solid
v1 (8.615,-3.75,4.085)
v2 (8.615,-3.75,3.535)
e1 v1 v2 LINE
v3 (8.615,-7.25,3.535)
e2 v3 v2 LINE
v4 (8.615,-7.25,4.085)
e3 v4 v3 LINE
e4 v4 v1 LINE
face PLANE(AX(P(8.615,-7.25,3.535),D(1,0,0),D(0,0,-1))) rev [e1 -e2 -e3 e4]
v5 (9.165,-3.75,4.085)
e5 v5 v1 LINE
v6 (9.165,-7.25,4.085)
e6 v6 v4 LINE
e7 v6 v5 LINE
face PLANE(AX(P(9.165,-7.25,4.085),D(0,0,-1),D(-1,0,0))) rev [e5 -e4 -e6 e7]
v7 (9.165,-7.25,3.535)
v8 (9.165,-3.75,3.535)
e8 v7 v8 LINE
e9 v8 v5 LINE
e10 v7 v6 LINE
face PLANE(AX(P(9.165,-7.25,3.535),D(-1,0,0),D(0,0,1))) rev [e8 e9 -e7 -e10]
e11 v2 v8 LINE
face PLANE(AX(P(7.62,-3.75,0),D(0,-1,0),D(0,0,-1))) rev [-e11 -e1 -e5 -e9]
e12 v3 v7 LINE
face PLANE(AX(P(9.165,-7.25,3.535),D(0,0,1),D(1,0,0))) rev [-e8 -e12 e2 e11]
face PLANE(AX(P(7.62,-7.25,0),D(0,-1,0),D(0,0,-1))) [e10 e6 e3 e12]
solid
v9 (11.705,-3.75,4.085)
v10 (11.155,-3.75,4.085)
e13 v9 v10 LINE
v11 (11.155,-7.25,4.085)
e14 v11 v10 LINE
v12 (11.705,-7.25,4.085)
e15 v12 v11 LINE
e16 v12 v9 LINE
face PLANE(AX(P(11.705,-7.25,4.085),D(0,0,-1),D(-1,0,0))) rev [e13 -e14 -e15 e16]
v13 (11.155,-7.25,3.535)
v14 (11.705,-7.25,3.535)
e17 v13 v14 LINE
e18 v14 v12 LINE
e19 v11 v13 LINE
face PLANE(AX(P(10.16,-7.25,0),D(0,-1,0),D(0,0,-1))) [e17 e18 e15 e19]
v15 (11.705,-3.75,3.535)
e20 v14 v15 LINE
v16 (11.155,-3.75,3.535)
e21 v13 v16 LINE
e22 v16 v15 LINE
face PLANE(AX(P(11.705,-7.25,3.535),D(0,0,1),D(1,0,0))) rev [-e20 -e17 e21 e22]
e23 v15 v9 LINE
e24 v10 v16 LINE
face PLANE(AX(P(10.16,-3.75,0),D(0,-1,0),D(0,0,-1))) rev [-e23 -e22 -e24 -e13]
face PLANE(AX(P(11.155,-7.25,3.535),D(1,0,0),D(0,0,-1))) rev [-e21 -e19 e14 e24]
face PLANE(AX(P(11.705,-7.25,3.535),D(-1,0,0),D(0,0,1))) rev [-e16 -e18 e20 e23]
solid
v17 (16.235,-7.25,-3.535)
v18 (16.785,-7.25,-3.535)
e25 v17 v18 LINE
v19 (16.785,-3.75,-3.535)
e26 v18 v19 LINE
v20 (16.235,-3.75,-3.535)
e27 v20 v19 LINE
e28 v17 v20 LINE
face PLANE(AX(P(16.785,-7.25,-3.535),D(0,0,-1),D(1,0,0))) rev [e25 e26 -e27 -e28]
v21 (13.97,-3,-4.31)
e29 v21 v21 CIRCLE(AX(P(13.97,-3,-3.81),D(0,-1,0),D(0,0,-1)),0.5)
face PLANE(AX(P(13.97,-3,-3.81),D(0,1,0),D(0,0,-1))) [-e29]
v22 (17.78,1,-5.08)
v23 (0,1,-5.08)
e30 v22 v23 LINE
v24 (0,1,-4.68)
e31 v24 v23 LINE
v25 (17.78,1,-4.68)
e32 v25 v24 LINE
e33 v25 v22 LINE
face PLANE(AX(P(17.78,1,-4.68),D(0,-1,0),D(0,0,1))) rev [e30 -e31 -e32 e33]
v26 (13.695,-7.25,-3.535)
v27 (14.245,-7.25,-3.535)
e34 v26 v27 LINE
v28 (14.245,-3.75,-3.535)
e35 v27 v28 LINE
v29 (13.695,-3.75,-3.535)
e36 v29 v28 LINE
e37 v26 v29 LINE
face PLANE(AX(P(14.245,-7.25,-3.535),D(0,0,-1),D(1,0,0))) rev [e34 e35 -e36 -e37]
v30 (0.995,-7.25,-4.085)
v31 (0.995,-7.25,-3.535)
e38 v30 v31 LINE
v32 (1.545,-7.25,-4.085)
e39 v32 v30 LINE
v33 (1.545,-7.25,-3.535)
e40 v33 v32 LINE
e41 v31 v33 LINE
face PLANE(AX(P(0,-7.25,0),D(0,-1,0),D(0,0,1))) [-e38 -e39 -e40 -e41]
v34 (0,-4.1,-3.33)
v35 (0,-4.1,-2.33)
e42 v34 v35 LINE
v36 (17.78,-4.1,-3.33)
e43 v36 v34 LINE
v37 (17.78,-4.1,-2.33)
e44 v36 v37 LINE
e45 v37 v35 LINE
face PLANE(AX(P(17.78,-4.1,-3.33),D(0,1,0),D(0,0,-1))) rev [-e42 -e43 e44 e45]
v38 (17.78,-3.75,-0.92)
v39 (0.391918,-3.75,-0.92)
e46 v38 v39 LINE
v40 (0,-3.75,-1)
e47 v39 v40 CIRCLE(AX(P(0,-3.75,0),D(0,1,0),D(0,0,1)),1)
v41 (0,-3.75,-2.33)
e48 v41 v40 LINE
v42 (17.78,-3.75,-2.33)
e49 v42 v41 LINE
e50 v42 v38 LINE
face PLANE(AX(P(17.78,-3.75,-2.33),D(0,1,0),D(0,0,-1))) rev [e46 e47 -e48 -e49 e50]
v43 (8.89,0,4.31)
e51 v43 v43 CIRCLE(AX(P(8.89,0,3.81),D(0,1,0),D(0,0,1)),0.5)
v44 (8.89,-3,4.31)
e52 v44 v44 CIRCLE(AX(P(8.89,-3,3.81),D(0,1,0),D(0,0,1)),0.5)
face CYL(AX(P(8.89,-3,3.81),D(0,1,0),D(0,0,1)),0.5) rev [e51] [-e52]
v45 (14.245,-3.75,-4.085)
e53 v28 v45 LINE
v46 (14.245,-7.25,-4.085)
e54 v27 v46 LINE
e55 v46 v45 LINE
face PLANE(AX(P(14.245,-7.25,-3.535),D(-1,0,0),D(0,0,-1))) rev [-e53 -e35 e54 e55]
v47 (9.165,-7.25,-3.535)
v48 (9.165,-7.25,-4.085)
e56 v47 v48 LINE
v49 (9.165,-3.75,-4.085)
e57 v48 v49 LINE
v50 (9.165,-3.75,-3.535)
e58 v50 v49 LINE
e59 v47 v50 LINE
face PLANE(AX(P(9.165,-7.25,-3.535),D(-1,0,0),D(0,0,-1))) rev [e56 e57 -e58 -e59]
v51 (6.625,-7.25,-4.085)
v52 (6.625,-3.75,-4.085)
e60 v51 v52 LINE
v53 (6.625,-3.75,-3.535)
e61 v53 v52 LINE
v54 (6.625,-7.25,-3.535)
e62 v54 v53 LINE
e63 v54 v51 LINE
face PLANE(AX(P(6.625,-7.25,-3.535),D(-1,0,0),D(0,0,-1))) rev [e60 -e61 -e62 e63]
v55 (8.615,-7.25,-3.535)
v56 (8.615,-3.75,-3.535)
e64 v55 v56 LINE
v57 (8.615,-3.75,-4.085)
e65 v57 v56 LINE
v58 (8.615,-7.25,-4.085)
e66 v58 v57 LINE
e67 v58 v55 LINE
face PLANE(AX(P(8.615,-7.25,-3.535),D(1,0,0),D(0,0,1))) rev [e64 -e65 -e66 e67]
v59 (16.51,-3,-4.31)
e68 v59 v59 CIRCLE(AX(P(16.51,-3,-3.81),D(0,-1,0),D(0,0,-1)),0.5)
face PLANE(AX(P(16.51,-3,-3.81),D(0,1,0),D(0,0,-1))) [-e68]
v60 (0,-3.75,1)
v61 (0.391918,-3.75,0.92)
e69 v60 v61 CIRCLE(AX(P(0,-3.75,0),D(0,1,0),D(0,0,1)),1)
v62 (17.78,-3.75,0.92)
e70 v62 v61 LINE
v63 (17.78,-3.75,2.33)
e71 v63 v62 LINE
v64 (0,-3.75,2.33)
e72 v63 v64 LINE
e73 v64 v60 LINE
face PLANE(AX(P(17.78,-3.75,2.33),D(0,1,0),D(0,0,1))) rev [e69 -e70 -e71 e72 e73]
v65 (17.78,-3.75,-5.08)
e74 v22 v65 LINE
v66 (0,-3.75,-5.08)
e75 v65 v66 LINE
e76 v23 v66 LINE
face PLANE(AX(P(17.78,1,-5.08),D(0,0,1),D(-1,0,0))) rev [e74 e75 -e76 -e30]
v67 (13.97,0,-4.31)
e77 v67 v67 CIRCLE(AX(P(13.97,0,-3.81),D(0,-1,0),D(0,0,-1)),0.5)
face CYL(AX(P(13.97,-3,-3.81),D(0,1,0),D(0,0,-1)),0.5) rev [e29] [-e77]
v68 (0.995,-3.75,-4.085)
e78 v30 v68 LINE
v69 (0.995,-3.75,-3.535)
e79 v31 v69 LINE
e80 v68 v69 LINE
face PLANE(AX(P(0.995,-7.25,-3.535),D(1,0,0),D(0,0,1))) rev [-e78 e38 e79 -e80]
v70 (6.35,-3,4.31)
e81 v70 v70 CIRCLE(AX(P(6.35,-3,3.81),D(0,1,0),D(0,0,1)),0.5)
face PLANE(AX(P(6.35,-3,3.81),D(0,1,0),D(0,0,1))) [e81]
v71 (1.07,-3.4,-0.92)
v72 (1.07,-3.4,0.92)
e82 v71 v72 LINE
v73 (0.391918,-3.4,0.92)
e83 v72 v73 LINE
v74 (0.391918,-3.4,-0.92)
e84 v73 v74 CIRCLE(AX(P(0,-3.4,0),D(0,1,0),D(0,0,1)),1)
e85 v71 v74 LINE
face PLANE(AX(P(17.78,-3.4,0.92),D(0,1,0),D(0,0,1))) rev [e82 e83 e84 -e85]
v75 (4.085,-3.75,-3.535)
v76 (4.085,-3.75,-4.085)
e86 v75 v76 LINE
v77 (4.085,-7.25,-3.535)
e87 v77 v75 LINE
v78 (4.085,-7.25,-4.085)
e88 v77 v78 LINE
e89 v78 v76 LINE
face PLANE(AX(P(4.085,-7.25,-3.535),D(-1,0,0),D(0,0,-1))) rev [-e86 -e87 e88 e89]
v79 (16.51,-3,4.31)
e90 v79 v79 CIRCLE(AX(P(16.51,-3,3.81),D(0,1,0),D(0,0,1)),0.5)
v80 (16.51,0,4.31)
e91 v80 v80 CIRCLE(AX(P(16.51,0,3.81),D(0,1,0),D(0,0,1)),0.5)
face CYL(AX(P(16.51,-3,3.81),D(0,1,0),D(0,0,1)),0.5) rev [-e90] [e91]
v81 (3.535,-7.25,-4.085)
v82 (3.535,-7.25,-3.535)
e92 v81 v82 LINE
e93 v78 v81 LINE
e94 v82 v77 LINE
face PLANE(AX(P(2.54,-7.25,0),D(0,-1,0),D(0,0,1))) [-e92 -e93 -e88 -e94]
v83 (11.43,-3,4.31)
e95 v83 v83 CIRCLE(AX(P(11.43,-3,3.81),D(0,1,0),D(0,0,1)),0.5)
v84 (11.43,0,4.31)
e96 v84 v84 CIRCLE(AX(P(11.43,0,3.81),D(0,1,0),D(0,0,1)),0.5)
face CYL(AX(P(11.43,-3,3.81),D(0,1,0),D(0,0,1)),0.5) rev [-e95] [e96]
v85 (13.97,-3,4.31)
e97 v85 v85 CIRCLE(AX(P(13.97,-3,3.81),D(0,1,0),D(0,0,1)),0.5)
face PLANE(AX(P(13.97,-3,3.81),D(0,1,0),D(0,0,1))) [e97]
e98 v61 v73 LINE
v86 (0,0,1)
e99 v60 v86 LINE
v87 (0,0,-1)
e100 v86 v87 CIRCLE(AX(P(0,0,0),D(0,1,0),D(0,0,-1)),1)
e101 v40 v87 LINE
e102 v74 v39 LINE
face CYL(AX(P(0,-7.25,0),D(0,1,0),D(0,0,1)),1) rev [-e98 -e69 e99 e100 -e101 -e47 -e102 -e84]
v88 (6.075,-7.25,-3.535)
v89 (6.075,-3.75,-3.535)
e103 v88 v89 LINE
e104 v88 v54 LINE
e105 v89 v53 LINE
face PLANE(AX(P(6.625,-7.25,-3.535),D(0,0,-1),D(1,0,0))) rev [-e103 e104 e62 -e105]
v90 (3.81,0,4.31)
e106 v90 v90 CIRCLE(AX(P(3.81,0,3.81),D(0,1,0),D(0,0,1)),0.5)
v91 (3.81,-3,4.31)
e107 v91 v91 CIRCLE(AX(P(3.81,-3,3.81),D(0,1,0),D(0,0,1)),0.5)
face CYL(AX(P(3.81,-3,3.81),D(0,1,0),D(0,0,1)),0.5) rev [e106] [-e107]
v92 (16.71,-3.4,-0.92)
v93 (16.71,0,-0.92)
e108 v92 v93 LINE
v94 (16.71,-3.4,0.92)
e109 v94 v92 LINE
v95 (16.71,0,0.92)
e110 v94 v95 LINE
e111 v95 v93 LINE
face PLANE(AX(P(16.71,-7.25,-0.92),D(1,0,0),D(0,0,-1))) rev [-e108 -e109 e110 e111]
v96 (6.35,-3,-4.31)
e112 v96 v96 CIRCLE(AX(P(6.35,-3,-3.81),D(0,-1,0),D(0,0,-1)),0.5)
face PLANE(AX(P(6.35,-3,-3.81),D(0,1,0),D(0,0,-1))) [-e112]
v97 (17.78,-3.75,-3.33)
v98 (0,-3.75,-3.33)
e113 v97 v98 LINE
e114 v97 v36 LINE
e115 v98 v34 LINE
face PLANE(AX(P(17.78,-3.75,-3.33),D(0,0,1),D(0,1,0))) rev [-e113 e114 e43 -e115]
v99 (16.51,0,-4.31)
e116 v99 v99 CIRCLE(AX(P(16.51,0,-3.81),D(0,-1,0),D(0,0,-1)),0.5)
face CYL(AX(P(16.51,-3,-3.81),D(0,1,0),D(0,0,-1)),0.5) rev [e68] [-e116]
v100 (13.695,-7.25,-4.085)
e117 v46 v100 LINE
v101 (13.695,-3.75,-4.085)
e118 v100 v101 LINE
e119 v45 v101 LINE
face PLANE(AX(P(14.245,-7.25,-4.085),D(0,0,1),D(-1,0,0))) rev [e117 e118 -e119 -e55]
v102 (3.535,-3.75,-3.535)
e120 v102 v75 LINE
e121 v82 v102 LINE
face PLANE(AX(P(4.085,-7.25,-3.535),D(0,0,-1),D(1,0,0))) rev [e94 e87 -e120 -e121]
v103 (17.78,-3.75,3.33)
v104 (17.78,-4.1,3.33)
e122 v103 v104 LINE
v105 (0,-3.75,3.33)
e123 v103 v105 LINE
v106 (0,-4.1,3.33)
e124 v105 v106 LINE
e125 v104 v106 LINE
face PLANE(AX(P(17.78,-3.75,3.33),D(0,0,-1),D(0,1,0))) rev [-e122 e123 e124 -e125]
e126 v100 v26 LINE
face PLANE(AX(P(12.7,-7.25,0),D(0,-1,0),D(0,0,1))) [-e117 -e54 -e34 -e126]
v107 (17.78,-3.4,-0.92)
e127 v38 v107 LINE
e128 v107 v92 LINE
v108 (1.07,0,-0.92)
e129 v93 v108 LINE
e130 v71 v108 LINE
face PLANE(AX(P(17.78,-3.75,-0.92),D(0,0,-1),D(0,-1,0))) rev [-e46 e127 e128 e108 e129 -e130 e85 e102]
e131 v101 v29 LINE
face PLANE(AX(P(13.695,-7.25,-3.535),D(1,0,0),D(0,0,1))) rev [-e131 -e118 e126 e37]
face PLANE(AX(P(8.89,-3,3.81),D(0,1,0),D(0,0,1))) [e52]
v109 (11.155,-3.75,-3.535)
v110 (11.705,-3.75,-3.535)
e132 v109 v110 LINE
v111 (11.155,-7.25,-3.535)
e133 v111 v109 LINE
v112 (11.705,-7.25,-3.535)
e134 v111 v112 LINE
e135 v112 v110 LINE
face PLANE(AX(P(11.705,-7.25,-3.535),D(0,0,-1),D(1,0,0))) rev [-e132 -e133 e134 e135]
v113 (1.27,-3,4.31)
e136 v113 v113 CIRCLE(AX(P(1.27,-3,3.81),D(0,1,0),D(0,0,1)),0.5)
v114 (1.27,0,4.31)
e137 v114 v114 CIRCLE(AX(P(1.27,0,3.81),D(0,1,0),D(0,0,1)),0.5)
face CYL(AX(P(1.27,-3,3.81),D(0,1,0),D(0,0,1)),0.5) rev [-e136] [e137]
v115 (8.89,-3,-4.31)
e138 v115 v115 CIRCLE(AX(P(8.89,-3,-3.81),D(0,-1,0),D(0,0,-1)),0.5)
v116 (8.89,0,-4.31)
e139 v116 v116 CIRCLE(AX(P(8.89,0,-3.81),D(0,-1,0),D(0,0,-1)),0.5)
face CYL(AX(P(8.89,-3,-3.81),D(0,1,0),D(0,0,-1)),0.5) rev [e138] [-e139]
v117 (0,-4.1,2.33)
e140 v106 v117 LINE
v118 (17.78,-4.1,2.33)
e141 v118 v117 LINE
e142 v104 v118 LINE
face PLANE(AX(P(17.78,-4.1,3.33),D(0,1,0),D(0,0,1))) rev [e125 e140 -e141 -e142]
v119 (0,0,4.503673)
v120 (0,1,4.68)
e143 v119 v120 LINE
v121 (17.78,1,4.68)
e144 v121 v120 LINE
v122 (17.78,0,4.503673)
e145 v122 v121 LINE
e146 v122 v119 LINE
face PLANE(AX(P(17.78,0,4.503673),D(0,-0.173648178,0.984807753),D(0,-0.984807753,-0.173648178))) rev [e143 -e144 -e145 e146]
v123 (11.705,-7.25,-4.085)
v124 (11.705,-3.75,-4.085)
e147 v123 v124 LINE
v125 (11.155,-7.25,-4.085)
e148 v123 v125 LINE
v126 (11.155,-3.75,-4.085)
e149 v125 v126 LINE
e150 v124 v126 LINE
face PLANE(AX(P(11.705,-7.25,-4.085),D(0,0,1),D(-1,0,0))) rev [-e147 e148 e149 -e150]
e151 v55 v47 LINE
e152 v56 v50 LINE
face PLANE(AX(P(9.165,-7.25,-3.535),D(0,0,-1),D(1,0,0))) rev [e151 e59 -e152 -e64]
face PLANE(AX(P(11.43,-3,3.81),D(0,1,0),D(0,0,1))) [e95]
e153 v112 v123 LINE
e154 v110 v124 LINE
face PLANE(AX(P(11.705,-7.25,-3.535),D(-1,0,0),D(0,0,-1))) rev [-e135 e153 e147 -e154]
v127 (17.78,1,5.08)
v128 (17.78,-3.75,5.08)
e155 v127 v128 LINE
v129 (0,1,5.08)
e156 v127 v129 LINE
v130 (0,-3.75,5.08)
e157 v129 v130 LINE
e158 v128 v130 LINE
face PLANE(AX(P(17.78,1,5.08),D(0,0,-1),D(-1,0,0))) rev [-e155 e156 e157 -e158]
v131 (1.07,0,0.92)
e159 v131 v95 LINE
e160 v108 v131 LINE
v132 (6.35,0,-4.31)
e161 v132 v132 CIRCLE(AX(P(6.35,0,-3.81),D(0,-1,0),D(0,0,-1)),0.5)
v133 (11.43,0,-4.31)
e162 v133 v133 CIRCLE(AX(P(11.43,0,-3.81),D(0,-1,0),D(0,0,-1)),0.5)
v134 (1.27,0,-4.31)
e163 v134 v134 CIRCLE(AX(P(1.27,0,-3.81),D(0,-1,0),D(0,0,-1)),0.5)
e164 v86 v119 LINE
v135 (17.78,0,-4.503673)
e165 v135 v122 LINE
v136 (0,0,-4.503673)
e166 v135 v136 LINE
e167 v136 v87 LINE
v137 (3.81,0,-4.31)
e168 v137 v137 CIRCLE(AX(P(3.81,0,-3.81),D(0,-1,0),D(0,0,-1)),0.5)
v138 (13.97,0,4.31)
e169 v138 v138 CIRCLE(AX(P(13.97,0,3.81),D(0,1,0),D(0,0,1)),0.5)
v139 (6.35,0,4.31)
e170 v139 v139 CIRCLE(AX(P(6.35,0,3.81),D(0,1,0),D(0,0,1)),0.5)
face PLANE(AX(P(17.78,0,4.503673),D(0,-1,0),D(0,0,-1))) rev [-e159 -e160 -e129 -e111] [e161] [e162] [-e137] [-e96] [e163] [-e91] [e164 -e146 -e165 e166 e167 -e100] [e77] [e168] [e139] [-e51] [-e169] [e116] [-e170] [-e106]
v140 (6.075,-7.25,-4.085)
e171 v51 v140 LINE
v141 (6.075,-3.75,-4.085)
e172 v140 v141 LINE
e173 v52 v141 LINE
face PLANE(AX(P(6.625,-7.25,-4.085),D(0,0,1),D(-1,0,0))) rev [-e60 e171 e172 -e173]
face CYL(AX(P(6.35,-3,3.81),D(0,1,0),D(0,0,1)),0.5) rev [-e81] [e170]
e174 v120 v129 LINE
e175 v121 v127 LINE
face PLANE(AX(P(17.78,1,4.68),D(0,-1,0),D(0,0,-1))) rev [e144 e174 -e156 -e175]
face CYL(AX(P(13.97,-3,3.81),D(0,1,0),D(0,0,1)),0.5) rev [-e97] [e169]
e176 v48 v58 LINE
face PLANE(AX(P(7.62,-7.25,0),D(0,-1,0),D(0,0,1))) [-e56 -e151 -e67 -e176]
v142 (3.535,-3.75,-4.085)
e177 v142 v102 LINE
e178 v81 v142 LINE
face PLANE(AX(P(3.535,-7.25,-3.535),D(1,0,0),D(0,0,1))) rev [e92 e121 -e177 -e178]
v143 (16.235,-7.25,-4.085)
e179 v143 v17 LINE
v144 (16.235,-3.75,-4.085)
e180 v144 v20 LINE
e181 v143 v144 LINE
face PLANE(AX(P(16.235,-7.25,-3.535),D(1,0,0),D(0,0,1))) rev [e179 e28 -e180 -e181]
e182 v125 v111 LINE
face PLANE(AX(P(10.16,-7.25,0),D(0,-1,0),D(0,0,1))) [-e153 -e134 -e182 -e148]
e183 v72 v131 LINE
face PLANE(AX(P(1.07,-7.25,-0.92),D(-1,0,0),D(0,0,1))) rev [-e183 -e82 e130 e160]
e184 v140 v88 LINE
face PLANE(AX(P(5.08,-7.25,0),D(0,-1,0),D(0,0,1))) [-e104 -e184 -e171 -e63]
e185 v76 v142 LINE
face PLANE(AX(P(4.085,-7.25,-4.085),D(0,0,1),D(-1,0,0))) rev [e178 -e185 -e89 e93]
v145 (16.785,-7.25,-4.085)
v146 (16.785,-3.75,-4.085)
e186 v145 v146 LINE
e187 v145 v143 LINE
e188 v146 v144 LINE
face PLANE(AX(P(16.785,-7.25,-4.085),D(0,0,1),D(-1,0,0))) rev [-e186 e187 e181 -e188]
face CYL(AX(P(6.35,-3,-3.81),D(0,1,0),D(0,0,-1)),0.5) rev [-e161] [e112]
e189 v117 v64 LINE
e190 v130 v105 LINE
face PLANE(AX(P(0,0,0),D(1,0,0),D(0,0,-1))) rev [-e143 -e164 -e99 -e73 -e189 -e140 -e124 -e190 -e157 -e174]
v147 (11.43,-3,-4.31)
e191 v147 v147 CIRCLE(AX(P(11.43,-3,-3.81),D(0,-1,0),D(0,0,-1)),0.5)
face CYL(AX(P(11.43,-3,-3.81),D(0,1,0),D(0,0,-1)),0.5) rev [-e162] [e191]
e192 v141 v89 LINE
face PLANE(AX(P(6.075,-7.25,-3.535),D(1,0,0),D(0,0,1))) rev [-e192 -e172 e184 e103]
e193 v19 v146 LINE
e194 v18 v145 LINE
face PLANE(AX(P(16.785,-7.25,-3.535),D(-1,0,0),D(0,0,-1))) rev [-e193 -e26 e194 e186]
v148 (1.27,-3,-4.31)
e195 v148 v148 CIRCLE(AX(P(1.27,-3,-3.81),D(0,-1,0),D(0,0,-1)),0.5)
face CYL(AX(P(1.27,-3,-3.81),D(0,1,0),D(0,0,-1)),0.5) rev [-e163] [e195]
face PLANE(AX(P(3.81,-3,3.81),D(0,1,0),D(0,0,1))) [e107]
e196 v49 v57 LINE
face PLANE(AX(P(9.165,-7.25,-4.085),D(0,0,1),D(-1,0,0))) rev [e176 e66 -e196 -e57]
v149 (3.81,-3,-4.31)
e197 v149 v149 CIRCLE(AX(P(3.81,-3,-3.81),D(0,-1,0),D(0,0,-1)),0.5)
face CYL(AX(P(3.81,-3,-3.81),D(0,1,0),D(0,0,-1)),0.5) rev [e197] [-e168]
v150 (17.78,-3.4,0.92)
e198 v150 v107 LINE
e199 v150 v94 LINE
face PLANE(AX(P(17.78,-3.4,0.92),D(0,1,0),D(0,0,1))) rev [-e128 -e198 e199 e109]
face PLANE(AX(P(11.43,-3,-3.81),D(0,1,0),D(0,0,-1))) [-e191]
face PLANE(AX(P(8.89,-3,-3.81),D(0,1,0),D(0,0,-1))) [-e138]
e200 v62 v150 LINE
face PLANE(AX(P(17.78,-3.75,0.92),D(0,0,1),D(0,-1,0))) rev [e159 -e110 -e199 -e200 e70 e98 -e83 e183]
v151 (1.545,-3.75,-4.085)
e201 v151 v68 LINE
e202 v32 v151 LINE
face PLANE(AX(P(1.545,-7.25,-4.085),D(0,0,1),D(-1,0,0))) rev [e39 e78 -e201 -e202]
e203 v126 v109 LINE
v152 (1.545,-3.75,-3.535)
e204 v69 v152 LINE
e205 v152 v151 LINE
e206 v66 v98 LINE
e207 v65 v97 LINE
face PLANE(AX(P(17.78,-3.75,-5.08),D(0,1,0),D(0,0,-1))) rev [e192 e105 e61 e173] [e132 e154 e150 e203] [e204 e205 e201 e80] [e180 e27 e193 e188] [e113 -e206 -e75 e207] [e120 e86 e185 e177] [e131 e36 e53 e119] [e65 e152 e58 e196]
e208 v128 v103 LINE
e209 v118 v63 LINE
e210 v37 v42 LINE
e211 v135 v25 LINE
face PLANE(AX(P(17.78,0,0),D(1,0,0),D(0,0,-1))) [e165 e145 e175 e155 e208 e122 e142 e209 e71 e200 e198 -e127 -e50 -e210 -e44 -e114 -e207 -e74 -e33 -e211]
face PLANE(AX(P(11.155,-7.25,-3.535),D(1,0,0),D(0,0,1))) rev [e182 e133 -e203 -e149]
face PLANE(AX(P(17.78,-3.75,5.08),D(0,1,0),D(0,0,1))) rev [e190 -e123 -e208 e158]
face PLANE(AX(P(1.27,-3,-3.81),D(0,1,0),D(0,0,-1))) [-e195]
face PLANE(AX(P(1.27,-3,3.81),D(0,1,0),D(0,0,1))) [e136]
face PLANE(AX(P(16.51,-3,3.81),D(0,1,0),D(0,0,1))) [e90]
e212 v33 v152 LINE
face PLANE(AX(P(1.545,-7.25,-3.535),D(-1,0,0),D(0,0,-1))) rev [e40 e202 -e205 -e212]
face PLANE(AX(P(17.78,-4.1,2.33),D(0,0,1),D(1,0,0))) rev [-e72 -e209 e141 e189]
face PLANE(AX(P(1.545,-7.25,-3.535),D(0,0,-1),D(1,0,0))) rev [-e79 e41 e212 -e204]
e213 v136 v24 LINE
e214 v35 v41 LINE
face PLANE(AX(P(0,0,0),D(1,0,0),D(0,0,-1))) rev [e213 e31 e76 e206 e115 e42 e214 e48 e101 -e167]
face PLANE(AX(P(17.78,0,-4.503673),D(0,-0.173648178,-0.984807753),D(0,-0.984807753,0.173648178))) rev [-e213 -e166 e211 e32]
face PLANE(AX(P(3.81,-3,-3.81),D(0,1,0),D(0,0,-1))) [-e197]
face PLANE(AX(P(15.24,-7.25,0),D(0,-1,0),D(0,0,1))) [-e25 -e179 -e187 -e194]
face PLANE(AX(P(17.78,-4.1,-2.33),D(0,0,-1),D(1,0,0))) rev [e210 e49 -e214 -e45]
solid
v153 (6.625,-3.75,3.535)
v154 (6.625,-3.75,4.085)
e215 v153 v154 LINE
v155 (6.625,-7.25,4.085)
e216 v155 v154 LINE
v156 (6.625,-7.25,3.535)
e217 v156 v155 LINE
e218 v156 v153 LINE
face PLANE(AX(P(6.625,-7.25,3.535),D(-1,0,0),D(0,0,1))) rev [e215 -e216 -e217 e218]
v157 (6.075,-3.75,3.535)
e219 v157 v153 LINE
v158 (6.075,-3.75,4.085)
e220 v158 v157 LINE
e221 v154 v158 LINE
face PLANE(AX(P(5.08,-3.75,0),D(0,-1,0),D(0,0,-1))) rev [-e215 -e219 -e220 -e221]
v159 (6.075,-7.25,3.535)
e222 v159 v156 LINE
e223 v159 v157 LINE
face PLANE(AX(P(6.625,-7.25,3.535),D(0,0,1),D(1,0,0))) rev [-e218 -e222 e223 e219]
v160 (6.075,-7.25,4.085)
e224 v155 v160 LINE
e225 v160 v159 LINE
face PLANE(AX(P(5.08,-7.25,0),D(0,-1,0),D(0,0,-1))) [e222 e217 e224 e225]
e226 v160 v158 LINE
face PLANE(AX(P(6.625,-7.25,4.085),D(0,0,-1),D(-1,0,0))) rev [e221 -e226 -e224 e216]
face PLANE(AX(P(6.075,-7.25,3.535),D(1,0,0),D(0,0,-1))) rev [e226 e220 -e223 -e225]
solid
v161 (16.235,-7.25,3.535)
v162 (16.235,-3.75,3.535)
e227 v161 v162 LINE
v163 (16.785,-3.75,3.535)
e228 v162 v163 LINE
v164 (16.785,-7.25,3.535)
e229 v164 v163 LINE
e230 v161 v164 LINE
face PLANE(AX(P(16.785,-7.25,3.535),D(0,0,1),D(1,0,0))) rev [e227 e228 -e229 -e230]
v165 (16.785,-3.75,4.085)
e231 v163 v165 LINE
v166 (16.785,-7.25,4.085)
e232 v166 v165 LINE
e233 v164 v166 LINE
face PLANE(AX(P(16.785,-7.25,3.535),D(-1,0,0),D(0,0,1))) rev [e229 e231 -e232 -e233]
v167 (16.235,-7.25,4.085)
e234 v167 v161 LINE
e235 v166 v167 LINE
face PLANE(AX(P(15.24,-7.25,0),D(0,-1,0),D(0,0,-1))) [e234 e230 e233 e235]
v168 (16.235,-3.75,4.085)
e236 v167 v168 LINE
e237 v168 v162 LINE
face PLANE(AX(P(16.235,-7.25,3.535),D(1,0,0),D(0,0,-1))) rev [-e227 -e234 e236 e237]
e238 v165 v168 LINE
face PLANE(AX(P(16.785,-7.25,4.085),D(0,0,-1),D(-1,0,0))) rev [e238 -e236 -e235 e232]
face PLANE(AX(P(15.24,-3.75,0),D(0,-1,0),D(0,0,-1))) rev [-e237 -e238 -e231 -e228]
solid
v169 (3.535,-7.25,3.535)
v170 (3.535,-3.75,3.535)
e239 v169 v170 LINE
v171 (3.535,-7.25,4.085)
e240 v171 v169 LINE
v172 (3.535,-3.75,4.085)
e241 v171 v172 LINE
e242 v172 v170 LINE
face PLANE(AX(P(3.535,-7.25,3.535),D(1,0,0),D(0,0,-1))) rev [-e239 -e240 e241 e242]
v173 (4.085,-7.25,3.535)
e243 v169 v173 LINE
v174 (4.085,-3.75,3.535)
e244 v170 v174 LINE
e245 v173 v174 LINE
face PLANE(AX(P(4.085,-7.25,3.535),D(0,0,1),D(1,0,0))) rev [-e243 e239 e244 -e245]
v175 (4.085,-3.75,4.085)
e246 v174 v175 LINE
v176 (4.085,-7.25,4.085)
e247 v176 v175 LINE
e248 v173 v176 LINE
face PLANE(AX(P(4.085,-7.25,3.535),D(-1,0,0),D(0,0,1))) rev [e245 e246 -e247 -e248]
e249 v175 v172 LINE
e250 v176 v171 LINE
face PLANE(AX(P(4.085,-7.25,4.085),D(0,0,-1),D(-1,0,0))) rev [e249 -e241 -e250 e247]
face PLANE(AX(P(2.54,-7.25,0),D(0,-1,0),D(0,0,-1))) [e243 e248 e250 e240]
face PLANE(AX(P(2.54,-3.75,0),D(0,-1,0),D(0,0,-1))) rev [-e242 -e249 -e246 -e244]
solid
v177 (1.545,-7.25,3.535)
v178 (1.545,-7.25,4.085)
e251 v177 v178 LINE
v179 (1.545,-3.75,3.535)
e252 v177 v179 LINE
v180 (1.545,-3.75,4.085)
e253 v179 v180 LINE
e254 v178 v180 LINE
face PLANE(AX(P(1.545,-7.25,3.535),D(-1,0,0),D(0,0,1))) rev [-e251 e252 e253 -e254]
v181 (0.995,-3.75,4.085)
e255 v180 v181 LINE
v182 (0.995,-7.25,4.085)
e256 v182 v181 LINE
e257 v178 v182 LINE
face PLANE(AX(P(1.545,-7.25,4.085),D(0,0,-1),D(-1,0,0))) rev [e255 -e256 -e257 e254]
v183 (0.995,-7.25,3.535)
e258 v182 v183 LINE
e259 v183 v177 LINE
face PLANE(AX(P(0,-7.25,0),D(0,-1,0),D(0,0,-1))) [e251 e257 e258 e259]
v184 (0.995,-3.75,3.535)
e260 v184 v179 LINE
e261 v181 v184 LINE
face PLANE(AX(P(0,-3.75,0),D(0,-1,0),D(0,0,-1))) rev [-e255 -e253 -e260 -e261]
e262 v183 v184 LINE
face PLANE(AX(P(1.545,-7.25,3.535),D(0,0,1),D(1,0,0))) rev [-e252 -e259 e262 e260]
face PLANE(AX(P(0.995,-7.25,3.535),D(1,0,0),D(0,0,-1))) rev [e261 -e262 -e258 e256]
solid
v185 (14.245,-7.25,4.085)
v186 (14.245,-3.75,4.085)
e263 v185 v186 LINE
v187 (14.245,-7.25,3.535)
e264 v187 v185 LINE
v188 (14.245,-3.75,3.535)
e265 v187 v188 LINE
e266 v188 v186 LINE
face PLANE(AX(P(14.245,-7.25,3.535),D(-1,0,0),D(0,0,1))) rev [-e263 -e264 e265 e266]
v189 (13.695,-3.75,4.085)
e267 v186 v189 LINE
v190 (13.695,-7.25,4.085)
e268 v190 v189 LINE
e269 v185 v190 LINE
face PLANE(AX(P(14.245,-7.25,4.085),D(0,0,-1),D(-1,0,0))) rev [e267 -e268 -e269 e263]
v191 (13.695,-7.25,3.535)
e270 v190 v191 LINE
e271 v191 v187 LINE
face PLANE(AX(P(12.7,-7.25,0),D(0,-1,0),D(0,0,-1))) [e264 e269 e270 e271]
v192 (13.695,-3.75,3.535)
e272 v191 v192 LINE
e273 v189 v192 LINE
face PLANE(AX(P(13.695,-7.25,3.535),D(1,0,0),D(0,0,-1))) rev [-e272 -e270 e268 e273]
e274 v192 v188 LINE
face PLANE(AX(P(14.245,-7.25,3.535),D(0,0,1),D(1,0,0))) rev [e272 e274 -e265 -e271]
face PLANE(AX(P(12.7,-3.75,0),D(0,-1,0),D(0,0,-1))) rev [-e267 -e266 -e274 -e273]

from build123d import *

# Parameters (mm, degrees)
SOCKET_HOUSING_DEPTH  = 17.78
SKETCH3_R             = 0.5
HOLES_DEPTH           = 3
SKETCH4_W             = 0.55
SKETCH4_H             = 0.55
PINS_DEPTH            = 3.5
LPATTERN3_START       = 16.235
LPATTERN3_OUTLINE_W   = 3.5
LPATTERN3_OUTLINE_H   = 0.55
LPATTERN3_DEPTH       = 0.55
LPATTERN3_START_2     = 13.695
LPATTERN3_2_OUTLINE_W = 3.5
LPATTERN3_2_OUTLINE_H = 0.55
LPATTERN3_2_DEPTH     = 0.55
LPATTERN3_START_3     = 11.155
LPATTERN3_3_OUTLINE_W = 3.5
LPATTERN3_3_OUTLINE_H = 0.55
LPATTERN3_3_DEPTH     = 0.55
LPATTERN3_START_4     = 8.615
LPATTERN3_4_OUTLINE_W = 3.5
LPATTERN3_4_OUTLINE_H = 0.55
LPATTERN3_4_DEPTH     = 0.55
LPATTERN3_START_5     = 6.075
LPATTERN3_5_OUTLINE_W = 3.5
LPATTERN3_5_OUTLINE_H = 0.55
LPATTERN3_5_DEPTH     = 0.55
LPATTERN3_START_6     = 3.535
LPATTERN3_6_OUTLINE_W = 3.5
LPATTERN3_6_OUTLINE_H = 0.55
LPATTERN3_6_DEPTH     = 0.55
LPATTERN3_START_7     = -3
LPATTERN3_7_OUTLINE_R = 0.5
LPATTERN3_7_DEPTH     = 3
MIRROR2_START         = -3
MIRROR2_OUTLINE_R     = 0.5
MIRROR2_DEPTH         = 3
MIRROR2_START_2       = -7.25
MIRROR2_2_OUTLINE_W   = 0.55
MIRROR2_2_OUTLINE_H   = 0.55
MIRROR2_2_DEPTH       = 3.5
SKETCH5_W             = 15.64
SKETCH5_H             = 1.84
CUT_EXTRUDE3_DEPTH    = 20.861956097


# Read off the part's stored shape, not the designer's step: LPattern3, Mirror2
with BuildPart() as part:
    # Sketch2 → socket_housing (new body)
    with BuildSketch(Plane(origin=(0, 0, 0), x_dir=(0, 0, -1), z_dir=(1, 0, 0))):
        Polygon((-5.08, -3.75), (-3.33, -3.75), (-3.33, -4.1), (-2.33, -4.1), (-2.33, -3.75), (-0.92, -3.75), (-0.92, -3.4), (0, -3.4), (0, 0), (-4.503673019, 0), (-4.68, 1), (-5.08, 1), align=None)
    socket_housing = extrude(amount=SOCKET_HOUSING_DEPTH)

    # Sketch3 → holes (cut)
    with BuildSketch(Plane(origin=(0, 0, 0), x_dir=(1, 0, 0), z_dir=(0, 1, 0))):
        with Locations(Location((1.27, -3.81, 0), (0, 0, 270))):
            Circle(SKETCH3_R)
    extrude(amount=-HOLES_DEPTH, mode=Mode.SUBTRACT)

    # LPattern3 7 outline → LPattern3 7 (cut)
    with BuildSketch(Plane(origin=(0, 0, 0), x_dir=(1, 0, 0), z_dir=(0, 1, 0)).offset(LPATTERN3_START_7)):
        with Locations((16.51, -3.81)):
            Circle(LPATTERN3_7_OUTLINE_R)
        with Locations((13.97, -3.81)):
            Circle(LPATTERN3_7_OUTLINE_R)
        with Locations((11.43, -3.81)):
            Circle(LPATTERN3_7_OUTLINE_R)
        with Locations((8.89, -3.81)):
            Circle(LPATTERN3_7_OUTLINE_R)
        with Locations((6.35, -3.81)):
            Circle(LPATTERN3_7_OUTLINE_R)
        with Locations((3.81, -3.81)):
            Circle(LPATTERN3_7_OUTLINE_R)
    extrude(amount=LPATTERN3_7_DEPTH, mode=Mode.SUBTRACT)

    # Mirror1: socket_housing across plane
    add(socket_housing.mirror(Plane.XY))

    # Mirror2 outline → Mirror2 (cut)
    with BuildSketch(Plane(origin=(0, 0, 0), x_dir=(1, 0, 0), z_dir=(0, 1, 0)).offset(MIRROR2_START)):
        with Locations((16.51, 3.81)):
            Circle(MIRROR2_OUTLINE_R)
        with Locations((13.97, 3.81)):
            Circle(MIRROR2_OUTLINE_R)
        with Locations((11.43, 3.81)):
            Circle(MIRROR2_OUTLINE_R)
        with Locations((8.89, 3.81)):
            Circle(MIRROR2_OUTLINE_R)
        with Locations((6.35, 3.81)):
            Circle(MIRROR2_OUTLINE_R)
        with Locations((3.81, 3.81)):
            Circle(MIRROR2_OUTLINE_R)
        with Locations((1.27, 3.81)):
            Circle(MIRROR2_OUTLINE_R)
    extrude(amount=MIRROR2_DEPTH, mode=Mode.SUBTRACT)

    # Mirror2 2 outline → Mirror2 2 (add)
    with BuildSketch(Plane(origin=(0, 0, 0), x_dir=(1, 0, 0), z_dir=(0, 1, 0)).offset(MIRROR2_START_2)):
        with Locations((16.51, 3.81)):
            Rectangle(MIRROR2_2_OUTLINE_W, MIRROR2_2_OUTLINE_H)
        with Locations((13.97, 3.81)):
            Rectangle(MIRROR2_2_OUTLINE_W, MIRROR2_2_OUTLINE_H)
        with Locations((11.43, 3.81)):
            Rectangle(MIRROR2_2_OUTLINE_W, MIRROR2_2_OUTLINE_H)
        with Locations((8.89, 3.81)):
            Rectangle(MIRROR2_2_OUTLINE_W, MIRROR2_2_OUTLINE_H)
        with Locations((6.35, 3.81)):
            Rectangle(MIRROR2_2_OUTLINE_W, MIRROR2_2_OUTLINE_H)
        with Locations((3.81, 3.81)):
            Rectangle(MIRROR2_2_OUTLINE_W, MIRROR2_2_OUTLINE_H)
        with Locations((1.27, 3.81)):
            Rectangle(MIRROR2_2_OUTLINE_W, MIRROR2_2_OUTLINE_H)
    extrude(amount=MIRROR2_2_DEPTH)

    # Sketch5 → Cut-Extrude3 (cut, through all)
    with BuildSketch(Plane(origin=(0, 0, 0), x_dir=(1, 0, 0), z_dir=(0, 1, 0))):
        with BuildLine():
            Line((0, 1), (0, -1))
            ThreePointArc((0, -1), (1, 0), (0, 1))
        make_face()
        with Locations((8.89, 0)):
            Rectangle(SKETCH5_W, SKETCH5_H)
    extrude(amount=-CUT_EXTRUDE3_DEPTH, mode=Mode.SUBTRACT)


with BuildPart() as body_2:
    # Sketch4 → pins (new body)
    with BuildSketch(Plane.XZ.offset(3.75)):
        with Locations((1.27, 3.81)):
            Rectangle(SKETCH4_W, SKETCH4_H)
    extrude(amount=PINS_DEPTH)


with BuildPart() as body_3:
    # LPattern3 outline → LPattern3 (new body)
    with BuildSketch(Plane.YZ.offset(LPATTERN3_START)):
        with Locations((-5.5, 3.81)):
            Rectangle(LPATTERN3_OUTLINE_W, LPATTERN3_OUTLINE_H)
    extrude(amount=LPATTERN3_DEPTH)


with BuildPart() as body_4:
    # LPattern3 2 outline → LPattern3 2 (new body)
    with BuildSketch(Plane.YZ.offset(LPATTERN3_START_2)):
        with Locations((-5.5, 3.81)):
            Rectangle(LPATTERN3_2_OUTLINE_W, LPATTERN3_2_OUTLINE_H)
    extrude(amount=LPATTERN3_2_DEPTH)


with BuildPart() as body_5:
    # LPattern3 3 outline → LPattern3 3 (new body)
    with BuildSketch(Plane.YZ.offset(LPATTERN3_START_3)):
        with Locations((-5.5, 3.81)):
            Rectangle(LPATTERN3_3_OUTLINE_W, LPATTERN3_3_OUTLINE_H)
    extrude(amount=LPATTERN3_3_DEPTH)


with BuildPart() as body_6:
    # LPattern3 4 outline → LPattern3 4 (new body)
    with BuildSketch(Plane.YZ.offset(LPATTERN3_START_4)):
        with Locations((-5.5, 3.81)):
            Rectangle(LPATTERN3_4_OUTLINE_W, LPATTERN3_4_OUTLINE_H)
    extrude(amount=LPATTERN3_4_DEPTH)


with BuildPart() as body_7:
    # LPattern3 5 outline → LPattern3 5 (new body)
    with BuildSketch(Plane.YZ.offset(LPATTERN3_START_5)):
        with Locations((-5.5, 3.81)):
            Rectangle(LPATTERN3_5_OUTLINE_W, LPATTERN3_5_OUTLINE_H)
    extrude(amount=LPATTERN3_5_DEPTH)


with BuildPart() as body_8:
    # LPattern3 6 outline → LPattern3 6 (new body)
    with BuildSketch(Plane.YZ.offset(LPATTERN3_START_6)):
        with Locations((-5.5, 3.81)):
            Rectangle(LPATTERN3_6_OUTLINE_W, LPATTERN3_6_OUTLINE_H)
    extrude(amount=LPATTERN3_6_DEPTH)


solid = Compound([part.part, body_2.part, body_3.part, body_4.part, body_5.part, body_6.part, body_7.part, body_8.part])
